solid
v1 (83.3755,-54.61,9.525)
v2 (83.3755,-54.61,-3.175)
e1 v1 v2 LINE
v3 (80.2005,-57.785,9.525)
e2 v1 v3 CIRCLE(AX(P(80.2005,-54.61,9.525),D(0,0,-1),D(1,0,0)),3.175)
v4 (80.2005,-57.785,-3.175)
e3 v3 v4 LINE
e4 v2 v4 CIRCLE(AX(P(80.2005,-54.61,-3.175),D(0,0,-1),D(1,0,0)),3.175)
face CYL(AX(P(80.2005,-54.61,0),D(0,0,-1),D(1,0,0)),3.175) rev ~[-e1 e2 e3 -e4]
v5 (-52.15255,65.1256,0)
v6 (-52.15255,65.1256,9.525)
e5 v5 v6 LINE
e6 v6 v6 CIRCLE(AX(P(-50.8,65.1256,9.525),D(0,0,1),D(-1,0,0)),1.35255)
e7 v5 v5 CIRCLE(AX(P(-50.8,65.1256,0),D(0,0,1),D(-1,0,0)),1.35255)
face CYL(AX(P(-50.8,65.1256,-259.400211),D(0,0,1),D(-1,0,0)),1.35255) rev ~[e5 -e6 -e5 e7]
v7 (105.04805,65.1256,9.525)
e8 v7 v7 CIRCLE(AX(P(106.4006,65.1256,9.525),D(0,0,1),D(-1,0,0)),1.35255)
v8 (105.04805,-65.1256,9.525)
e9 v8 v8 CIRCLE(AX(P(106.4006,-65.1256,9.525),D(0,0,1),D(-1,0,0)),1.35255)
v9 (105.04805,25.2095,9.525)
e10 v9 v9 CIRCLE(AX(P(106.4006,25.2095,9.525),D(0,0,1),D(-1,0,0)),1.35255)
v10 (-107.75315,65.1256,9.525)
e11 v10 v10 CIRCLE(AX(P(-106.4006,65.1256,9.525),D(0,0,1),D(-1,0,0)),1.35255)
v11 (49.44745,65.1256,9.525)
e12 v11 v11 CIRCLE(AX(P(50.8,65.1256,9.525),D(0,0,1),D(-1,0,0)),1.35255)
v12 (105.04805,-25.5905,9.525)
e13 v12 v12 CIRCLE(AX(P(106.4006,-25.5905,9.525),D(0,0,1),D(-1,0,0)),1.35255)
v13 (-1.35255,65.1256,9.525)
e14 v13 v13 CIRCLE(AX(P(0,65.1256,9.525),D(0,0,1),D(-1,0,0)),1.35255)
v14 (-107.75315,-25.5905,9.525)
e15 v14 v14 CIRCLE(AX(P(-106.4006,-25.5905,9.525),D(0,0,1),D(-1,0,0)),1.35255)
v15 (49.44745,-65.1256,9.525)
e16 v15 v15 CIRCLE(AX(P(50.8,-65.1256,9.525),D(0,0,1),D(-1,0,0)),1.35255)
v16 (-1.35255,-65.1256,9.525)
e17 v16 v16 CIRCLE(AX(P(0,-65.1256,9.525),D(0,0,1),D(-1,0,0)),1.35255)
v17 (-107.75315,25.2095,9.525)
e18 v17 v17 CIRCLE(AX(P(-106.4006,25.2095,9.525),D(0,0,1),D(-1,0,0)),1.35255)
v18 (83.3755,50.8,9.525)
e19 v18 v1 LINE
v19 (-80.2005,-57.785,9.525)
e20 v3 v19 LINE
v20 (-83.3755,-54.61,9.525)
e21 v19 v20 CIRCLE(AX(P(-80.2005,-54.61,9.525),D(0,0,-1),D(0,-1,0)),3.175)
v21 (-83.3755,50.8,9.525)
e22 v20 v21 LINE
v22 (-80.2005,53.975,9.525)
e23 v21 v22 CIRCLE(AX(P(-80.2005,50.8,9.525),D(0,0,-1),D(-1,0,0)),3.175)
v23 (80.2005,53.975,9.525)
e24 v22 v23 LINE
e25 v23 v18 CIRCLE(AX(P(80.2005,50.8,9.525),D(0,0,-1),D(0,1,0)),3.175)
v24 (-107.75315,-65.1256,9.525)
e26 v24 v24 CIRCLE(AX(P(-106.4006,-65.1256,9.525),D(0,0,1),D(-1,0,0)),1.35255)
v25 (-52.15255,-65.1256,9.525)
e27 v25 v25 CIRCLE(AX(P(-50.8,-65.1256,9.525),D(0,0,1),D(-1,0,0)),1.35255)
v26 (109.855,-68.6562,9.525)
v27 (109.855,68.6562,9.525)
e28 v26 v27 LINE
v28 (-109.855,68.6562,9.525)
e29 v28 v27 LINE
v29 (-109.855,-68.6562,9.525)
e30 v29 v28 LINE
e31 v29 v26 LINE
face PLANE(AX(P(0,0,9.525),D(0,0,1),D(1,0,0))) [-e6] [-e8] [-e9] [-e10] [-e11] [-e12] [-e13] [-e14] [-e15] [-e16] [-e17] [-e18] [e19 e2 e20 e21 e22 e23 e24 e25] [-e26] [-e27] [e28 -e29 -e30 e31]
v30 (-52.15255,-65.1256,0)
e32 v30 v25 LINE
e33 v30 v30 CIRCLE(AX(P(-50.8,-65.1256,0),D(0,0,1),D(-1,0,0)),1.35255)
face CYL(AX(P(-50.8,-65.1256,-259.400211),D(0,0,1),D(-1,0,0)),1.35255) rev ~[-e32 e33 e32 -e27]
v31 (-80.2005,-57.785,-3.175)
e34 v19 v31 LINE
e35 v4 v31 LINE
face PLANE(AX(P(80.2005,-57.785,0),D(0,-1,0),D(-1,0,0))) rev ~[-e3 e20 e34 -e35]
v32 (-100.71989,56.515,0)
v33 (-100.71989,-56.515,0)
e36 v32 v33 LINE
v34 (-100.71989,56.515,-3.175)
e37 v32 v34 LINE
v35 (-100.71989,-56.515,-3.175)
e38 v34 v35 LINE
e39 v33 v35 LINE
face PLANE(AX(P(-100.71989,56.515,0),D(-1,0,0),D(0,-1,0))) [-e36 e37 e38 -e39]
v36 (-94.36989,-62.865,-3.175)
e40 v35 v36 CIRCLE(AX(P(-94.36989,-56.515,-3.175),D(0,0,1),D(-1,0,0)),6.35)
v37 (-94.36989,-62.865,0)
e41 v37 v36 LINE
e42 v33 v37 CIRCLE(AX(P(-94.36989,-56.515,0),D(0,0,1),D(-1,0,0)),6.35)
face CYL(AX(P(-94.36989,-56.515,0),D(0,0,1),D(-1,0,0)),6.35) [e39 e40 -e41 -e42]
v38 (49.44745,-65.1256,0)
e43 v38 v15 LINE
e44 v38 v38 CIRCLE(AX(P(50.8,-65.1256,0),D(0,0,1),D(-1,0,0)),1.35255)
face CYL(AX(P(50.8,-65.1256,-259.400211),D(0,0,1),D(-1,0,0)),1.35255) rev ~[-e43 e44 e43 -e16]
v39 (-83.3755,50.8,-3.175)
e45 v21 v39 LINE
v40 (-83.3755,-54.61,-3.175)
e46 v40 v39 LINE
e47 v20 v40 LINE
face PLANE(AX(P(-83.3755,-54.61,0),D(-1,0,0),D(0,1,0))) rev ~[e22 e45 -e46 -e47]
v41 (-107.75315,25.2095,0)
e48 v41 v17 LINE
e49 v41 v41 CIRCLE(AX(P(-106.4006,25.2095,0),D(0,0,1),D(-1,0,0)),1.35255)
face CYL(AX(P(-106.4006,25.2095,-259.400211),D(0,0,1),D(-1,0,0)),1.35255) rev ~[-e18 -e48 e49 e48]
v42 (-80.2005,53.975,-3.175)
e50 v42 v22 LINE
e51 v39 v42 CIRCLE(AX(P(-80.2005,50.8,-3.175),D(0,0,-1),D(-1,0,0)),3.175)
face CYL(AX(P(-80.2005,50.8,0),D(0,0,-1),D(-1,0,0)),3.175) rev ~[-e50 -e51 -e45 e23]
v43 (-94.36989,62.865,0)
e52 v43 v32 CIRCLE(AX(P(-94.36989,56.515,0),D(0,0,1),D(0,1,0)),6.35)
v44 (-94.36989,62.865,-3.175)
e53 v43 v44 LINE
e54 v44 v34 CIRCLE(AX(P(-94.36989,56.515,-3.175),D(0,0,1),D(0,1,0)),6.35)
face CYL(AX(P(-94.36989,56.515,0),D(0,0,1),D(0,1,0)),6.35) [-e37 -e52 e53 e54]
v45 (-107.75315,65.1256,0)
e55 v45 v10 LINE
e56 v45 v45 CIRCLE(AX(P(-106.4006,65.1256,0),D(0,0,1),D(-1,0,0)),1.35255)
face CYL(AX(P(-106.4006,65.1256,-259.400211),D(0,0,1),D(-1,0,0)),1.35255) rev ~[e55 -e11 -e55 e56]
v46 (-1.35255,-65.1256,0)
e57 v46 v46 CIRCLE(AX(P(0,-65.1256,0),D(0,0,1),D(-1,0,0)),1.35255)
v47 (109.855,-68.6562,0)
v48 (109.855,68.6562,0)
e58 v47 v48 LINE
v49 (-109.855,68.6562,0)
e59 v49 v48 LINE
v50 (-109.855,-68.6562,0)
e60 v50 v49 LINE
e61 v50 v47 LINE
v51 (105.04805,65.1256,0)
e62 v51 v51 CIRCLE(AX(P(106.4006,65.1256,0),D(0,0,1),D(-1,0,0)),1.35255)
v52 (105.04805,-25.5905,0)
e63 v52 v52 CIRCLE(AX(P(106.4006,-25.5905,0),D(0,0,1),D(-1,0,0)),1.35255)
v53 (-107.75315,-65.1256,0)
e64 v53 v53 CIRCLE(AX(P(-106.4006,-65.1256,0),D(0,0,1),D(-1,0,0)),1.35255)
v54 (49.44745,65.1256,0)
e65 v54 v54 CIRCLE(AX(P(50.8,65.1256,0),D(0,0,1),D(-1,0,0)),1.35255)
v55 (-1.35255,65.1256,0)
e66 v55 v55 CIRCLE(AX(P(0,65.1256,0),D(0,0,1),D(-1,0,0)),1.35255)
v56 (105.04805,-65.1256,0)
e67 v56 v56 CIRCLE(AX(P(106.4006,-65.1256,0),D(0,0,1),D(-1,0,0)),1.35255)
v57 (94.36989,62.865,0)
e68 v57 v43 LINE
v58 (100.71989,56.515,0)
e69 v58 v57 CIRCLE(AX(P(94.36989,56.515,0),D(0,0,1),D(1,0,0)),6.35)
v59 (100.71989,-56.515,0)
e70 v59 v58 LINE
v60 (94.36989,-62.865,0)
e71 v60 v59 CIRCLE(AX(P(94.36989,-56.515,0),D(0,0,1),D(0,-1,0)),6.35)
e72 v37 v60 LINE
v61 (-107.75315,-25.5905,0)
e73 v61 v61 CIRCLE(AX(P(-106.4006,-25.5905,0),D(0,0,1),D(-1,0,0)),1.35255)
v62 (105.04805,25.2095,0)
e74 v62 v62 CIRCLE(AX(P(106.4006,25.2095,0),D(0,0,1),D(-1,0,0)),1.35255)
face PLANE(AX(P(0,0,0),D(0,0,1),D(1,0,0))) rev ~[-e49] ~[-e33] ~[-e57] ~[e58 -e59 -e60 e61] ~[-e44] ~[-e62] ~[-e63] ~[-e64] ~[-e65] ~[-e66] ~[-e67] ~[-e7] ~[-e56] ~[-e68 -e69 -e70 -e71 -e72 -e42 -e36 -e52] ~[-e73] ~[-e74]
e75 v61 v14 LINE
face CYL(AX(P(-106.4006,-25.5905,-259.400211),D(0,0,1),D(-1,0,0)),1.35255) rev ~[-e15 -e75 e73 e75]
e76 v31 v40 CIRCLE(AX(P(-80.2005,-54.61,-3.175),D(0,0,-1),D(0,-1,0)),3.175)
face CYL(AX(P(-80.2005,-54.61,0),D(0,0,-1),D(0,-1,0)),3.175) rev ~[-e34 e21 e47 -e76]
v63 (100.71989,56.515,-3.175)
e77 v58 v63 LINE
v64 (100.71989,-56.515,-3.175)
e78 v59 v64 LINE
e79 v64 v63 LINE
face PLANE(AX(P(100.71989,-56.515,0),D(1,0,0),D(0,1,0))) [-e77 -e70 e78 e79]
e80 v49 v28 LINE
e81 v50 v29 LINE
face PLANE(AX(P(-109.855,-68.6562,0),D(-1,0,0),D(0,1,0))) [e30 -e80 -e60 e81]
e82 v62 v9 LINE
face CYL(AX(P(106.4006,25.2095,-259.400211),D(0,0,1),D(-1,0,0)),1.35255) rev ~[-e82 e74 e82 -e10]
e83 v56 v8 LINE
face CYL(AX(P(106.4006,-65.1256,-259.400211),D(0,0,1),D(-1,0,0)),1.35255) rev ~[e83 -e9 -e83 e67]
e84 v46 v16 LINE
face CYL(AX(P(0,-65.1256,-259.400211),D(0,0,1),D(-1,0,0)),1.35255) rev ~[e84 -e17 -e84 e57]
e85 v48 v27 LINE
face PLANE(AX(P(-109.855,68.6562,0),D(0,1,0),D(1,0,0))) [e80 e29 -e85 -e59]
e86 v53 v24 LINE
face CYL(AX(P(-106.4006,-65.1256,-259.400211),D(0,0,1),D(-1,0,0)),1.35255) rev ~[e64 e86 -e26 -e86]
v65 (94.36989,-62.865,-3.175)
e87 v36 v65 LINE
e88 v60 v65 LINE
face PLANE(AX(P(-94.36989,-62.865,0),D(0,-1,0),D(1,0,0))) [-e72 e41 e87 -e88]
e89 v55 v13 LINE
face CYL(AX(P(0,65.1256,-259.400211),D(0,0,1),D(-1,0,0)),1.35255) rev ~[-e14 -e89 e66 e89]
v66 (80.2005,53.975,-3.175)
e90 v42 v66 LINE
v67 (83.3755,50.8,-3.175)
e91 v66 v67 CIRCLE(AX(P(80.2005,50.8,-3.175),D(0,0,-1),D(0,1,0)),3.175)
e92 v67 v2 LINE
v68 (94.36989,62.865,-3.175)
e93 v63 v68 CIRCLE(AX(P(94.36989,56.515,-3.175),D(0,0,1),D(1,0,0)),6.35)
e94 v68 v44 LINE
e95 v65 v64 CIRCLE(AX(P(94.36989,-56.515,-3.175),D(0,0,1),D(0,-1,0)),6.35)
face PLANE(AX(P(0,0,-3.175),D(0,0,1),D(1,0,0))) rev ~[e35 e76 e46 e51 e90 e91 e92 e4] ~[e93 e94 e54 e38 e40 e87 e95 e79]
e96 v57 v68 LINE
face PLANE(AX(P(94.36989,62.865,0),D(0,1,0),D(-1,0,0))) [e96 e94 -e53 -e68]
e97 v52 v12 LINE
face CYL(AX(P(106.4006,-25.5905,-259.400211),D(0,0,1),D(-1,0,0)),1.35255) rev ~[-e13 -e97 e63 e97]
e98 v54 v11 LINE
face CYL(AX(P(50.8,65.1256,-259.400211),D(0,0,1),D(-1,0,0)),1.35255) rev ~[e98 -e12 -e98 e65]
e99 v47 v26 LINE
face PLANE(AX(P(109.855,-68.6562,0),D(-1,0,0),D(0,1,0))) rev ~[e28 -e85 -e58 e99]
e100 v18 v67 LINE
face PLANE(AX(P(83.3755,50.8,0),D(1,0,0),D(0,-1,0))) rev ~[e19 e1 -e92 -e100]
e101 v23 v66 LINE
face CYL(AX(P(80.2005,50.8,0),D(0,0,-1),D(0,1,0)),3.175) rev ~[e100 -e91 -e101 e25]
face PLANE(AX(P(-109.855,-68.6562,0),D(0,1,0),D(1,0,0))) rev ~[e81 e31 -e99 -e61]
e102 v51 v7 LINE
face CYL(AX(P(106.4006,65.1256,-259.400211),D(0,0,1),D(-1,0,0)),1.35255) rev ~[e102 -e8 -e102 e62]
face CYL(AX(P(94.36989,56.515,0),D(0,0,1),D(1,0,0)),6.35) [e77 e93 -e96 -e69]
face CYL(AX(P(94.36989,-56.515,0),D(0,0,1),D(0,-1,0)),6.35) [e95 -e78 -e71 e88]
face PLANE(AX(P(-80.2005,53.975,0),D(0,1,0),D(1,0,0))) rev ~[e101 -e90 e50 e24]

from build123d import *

# Parameters (mm, degrees)
F1_DEPTH = 3.175
F2_W     = 219.71
F2_H     = 137.3124
F3_DEPTH = 9.525
F5_D     = 2.7051


# Not quite as in the source:
# - a feature of the source that left no trace in its solid (it failed there, or was rolled back) is left out


with BuildPart() as f1:
    # F0 (on Top) → F1 (new body)
    with BuildSketch(Plane.XY):
        with BuildLine():
            ThreePointArc((100.71989, 56.515), (98.8600180605, 61.0051280605), (94.36989, 62.865))
            Line((94.36989, 62.865), (-94.36989, 62.865))
            ThreePointArc((-94.36989, 62.865), (-98.8600180605, 61.0051280605), (-100.71989, 56.515))
            Line((-100.71989, 56.515), (-100.71989, -56.515))
            ThreePointArc((-100.71989, -56.515), (-98.8600180605, -61.0051280605), (-94.36989, -62.865))
            Line((-94.36989, -62.865), (94.36989, -62.865))
            ThreePointArc((94.36989, -62.865), (98.8600180605, -61.0051280605), (100.71989, -56.515))
            Line((100.71989, -56.515), (100.71989, 56.515))
        make_face()
        with BuildLine():
            ThreePointArc((83.3755, -54.61), (82.4455640303, -56.8550640303), (80.2005, -57.785))
            Line((80.2005, -57.785), (-80.2005, -57.785))
            ThreePointArc((-80.2005, -57.785), (-82.4455640303, -56.8550640303), (-83.3755, -54.61))
            Line((-83.3755, -54.61), (-83.3755, 50.8))
            ThreePointArc((-83.3755, 50.8), (-82.4455640303, 53.0450640303), (-80.2005, 53.975))
            Line((-80.2005, 53.975), (80.2005, 53.975))
            ThreePointArc((80.2005, 53.975), (82.4455640303, 53.0450640303), (83.3755, 50.8))
            Line((83.3755, 50.8), (83.3755, -54.61))
        make_face(mode=Mode.SUBTRACT)
    extrude(amount=-F1_DEPTH)

    # F2 (on face) → F3 (join)
    with BuildSketch(Plane.XY):
        Rectangle(F2_W, F2_H)
        with BuildLine():
            Line((-80.2005, 53.975), (80.2005, 53.975))
            ThreePointArc((80.2005, 53.975), (82.4455640303, 53.0450640303), (83.3755, 50.8))
            Line((83.3755, 50.8), (83.3755, -54.61))
            ThreePointArc((83.3755, -54.61), (82.4455640303, -56.8550640303), (80.2005, -57.785))
            Line((80.2005, -57.785), (-80.2005, -57.785))
            ThreePointArc((-80.2005, -57.785), (-82.4455640303, -56.8550640303), (-83.3755, -54.61))
            Line((-83.3755, -54.61), (-83.3755, 50.8))
            ThreePointArc((-83.3755, 50.8), (-82.4455640303, 53.0450640303), (-80.2005, 53.975))
        make_face(mode=Mode.SUBTRACT)
    extrude(amount=F3_DEPTH)

    # F5 (through all)
    with Locations(Plane(origin=(0, 0, 0), x_dir=(1, 0, 0), z_dir=(0, 0, -1))):
        with Locations((106.4006, -65.1256), (50.8, -65.1256), (0, -65.1256), (-50.8, -65.1256), (-106.4006, -65.1256), (-106.4006, -25.2095), (-106.4006, 25.5905), (-106.4006, 65.1256), (0, 65.1256), (-50.8, 65.1256), (50.8, 65.1256), (106.4006, 65.1256), (106.4006, 25.5905), (106.4006, -25.2095)):
            Hole(F5_D / 2)


solid = f1.part
